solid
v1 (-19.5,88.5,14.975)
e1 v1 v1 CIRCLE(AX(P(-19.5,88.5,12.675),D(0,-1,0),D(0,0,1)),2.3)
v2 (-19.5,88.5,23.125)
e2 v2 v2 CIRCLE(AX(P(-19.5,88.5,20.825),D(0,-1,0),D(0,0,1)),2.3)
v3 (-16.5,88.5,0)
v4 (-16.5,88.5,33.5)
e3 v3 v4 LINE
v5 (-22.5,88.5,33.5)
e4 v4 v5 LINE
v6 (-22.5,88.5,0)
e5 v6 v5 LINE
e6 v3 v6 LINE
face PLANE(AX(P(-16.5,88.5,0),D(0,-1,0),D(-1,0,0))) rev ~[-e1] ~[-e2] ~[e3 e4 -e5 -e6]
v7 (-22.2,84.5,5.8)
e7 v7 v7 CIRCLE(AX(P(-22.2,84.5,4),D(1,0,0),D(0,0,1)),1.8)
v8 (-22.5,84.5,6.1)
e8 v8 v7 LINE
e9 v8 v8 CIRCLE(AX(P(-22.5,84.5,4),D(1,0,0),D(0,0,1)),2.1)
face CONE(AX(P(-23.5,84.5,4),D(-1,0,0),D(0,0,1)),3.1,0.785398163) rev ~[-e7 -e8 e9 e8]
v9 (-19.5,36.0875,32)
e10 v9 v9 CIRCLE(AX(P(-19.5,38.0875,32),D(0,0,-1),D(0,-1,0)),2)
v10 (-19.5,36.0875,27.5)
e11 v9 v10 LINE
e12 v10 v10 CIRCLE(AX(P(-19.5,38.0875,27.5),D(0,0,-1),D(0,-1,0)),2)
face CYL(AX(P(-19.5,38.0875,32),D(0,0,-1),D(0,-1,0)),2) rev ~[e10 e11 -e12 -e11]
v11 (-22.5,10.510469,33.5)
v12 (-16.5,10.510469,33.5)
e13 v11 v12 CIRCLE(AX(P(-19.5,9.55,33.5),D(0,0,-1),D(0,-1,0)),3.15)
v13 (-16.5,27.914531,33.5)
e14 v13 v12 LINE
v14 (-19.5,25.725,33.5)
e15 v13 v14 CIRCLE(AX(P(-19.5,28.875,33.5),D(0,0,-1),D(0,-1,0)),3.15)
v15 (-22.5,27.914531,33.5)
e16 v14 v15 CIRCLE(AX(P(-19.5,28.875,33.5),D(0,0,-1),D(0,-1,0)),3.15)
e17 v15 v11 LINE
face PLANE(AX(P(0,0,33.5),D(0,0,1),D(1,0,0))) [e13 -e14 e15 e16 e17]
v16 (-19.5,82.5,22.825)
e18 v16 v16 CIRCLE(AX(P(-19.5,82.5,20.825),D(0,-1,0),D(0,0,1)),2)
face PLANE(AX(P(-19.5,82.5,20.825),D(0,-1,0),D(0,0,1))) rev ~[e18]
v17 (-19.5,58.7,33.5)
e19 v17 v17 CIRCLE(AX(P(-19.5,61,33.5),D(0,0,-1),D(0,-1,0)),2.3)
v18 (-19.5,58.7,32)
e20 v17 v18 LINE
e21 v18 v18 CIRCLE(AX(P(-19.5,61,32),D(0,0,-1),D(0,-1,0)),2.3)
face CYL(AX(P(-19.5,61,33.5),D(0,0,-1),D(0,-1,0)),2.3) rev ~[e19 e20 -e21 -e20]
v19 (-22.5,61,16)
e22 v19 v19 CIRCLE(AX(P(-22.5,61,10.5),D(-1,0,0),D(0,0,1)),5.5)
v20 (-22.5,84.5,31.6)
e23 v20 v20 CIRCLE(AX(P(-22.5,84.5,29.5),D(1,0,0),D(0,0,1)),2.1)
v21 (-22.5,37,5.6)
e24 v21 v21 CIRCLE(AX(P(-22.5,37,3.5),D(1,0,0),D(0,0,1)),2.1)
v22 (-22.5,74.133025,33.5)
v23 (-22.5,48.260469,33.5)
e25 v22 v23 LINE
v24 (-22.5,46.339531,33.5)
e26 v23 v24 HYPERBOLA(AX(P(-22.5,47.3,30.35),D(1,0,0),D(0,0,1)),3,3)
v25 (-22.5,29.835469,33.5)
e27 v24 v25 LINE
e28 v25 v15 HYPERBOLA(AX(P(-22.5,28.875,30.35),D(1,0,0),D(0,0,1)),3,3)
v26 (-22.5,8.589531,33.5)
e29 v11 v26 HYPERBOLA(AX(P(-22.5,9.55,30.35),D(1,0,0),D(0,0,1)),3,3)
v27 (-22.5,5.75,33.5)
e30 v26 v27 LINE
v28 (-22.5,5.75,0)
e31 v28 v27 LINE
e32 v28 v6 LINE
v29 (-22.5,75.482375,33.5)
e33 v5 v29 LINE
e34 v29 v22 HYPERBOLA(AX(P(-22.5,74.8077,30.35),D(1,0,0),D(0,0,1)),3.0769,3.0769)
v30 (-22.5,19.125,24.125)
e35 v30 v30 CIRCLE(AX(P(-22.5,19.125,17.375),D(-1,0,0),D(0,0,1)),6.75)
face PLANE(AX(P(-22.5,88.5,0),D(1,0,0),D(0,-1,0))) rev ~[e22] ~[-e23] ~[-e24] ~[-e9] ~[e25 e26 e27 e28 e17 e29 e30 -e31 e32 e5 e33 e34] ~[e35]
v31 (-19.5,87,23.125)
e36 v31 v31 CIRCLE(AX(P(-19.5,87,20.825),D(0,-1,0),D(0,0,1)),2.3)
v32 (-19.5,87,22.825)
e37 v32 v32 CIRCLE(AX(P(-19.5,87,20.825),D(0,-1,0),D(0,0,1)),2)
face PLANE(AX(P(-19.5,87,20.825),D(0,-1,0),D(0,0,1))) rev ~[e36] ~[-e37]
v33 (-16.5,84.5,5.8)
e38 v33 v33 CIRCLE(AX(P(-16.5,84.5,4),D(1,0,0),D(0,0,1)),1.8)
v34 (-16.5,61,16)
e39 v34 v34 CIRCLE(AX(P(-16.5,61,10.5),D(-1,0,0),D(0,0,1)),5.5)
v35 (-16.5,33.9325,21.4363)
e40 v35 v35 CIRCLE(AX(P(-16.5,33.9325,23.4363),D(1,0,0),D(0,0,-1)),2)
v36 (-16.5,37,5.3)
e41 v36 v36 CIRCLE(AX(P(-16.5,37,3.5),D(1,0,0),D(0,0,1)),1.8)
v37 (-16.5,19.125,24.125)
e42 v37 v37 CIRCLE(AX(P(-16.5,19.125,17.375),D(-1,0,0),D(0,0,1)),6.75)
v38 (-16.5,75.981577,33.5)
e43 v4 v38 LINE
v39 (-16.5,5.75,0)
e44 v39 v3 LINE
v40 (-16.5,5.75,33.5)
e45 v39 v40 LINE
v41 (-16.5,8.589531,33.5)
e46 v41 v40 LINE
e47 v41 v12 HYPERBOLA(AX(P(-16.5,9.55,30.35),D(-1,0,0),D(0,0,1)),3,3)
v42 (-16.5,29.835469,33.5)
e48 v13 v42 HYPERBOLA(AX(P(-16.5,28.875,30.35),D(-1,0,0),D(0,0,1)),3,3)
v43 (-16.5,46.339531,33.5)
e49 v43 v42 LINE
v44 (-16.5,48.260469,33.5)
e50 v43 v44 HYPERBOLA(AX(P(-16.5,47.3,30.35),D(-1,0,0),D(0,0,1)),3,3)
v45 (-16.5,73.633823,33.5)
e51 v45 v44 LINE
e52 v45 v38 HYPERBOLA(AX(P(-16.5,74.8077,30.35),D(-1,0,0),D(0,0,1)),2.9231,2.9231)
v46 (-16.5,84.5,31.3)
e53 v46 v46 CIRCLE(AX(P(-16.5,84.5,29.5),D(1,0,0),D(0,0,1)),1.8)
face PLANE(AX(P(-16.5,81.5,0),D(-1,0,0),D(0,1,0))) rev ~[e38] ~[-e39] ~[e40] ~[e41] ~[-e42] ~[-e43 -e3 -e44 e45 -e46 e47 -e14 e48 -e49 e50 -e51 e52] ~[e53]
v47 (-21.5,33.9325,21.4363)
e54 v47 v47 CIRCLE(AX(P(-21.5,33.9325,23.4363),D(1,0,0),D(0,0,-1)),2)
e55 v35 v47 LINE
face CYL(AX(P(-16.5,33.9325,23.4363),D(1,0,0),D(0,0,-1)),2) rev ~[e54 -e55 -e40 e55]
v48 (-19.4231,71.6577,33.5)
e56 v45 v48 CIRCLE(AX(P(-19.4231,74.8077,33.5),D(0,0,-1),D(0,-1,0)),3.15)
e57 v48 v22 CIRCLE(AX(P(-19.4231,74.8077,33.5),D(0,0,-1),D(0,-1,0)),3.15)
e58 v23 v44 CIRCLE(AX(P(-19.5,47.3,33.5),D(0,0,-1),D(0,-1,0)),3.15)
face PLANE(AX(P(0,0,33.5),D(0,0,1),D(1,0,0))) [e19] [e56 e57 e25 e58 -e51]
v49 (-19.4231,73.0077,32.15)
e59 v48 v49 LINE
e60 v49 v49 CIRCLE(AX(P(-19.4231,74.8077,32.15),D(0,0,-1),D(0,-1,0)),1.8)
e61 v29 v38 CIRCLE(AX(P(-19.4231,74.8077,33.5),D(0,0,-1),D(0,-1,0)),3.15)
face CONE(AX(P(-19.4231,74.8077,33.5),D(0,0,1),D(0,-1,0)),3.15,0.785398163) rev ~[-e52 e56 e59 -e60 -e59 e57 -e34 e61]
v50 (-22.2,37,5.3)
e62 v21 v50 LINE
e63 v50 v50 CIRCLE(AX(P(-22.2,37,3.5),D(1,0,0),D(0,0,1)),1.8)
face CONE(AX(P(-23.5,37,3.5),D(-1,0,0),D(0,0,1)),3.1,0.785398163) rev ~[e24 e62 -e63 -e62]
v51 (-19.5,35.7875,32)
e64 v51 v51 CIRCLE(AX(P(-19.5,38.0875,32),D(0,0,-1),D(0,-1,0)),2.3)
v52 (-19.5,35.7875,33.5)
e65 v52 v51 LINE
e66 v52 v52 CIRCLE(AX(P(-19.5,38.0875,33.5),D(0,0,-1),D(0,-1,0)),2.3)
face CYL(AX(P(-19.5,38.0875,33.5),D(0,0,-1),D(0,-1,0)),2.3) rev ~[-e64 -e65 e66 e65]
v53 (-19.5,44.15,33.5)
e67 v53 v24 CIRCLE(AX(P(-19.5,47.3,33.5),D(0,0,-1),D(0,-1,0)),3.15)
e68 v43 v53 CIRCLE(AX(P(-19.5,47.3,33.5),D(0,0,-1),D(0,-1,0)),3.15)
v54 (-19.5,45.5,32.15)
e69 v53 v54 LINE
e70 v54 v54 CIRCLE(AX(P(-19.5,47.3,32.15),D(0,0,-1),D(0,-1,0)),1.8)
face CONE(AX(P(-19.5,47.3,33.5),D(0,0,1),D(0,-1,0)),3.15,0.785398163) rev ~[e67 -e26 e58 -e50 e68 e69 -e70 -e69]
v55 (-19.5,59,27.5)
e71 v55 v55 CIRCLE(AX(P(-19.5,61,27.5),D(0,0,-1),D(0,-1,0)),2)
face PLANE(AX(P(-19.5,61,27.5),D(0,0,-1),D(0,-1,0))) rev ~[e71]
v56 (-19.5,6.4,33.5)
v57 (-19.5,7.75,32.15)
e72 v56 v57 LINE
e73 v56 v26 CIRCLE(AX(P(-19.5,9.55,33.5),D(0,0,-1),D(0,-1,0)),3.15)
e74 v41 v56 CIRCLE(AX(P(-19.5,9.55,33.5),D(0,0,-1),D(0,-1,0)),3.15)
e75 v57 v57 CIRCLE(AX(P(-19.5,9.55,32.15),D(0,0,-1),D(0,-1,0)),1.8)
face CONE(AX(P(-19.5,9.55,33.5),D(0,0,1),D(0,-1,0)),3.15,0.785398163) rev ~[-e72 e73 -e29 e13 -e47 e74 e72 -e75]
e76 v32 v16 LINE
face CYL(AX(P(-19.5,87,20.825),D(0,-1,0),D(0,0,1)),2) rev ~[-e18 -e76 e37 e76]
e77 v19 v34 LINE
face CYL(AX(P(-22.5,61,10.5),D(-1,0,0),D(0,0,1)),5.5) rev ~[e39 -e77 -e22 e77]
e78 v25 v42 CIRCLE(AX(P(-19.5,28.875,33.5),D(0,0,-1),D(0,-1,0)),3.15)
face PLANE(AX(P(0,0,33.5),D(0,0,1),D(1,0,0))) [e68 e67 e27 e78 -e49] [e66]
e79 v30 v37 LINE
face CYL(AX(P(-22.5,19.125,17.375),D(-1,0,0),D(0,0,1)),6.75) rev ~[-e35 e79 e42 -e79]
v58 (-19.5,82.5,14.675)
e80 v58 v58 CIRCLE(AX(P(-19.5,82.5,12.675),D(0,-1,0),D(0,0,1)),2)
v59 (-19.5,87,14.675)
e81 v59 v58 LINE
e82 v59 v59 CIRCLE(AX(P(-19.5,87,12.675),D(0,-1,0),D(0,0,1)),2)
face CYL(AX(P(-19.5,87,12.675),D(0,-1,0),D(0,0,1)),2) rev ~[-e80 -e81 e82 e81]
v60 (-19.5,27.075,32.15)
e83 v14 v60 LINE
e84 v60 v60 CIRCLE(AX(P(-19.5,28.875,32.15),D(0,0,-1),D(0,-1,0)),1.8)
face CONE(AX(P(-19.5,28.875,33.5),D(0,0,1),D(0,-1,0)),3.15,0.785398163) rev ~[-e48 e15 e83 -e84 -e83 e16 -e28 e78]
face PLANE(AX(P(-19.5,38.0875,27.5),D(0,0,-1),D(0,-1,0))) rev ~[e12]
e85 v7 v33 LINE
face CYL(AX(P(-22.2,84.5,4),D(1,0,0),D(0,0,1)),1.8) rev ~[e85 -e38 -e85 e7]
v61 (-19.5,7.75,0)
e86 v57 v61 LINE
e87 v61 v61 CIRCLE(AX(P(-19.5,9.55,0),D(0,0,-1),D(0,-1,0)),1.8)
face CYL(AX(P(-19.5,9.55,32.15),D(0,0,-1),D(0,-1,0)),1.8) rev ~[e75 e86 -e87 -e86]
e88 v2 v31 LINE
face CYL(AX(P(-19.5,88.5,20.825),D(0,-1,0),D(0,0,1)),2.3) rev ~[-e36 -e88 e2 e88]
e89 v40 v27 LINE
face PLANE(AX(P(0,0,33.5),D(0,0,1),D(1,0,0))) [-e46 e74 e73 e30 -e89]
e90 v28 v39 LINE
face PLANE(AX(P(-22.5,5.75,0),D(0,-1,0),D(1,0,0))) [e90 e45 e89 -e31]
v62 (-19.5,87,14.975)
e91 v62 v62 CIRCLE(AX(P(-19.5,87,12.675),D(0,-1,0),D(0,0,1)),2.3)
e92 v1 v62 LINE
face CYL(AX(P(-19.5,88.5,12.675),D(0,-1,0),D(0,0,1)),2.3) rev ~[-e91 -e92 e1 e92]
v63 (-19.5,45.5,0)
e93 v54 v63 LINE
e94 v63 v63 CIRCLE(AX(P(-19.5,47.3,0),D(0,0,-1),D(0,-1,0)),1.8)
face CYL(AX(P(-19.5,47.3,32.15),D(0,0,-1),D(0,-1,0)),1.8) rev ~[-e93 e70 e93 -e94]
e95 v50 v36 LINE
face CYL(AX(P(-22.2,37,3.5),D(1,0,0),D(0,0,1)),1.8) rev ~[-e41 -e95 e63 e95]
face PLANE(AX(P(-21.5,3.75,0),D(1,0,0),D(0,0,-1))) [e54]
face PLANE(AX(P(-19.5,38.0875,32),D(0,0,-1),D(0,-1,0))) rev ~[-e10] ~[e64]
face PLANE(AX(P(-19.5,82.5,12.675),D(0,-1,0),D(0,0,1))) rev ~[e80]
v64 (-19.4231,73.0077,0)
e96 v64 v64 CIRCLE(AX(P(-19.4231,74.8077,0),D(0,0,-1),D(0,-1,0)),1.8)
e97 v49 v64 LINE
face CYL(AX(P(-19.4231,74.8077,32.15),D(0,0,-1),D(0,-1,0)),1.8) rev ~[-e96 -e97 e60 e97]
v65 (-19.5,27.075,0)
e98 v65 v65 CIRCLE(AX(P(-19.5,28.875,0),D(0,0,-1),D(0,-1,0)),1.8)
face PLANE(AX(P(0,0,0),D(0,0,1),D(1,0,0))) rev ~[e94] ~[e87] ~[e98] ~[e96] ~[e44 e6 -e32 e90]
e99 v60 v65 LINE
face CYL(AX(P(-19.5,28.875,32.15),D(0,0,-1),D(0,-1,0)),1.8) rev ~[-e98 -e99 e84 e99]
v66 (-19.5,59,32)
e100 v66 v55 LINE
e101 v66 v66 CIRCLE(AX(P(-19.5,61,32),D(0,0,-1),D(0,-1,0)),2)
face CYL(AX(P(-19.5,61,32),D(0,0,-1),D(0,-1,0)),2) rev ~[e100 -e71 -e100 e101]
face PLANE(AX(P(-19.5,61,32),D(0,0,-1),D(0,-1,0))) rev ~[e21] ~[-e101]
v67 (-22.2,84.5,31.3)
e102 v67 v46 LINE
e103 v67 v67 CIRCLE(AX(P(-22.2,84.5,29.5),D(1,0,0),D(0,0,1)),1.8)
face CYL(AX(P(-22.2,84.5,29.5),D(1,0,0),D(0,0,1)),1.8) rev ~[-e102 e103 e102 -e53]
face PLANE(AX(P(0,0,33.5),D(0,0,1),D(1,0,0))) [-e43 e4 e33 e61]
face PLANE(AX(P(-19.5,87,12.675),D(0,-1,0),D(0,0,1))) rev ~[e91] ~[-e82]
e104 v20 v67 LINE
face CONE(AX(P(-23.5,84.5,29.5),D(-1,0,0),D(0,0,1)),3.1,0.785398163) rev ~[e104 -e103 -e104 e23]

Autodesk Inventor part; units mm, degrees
ref_plane "YZ Plane" through (0, 0, 0) normal (1, 0, 0) x (0, 1, 0)
ref_plane "XZ Plane" through (0, 0, 0) normal (0, 1, 0) x (-1, 0, 0)
ref_plane "Work Plane1" through (0, 0, 0) normal (0, 0, 1) x (1, 0, 0)
sketch "Sketch1" plane through (0, 0, 0) normal (0, 0, 1) x (1, 0, 0)
  line L0 (23.5, 88.5) -> (-23.5, 88.5) projected
  line L1 (-23.5, 88.5) -> (-23.5, 36.5) projected
  line L2 (-26.5, 33.5) -> (-89, 33.5) projected
  line L3 (-89, 33.5) -> (-89, -72.5) projected
  line L4 (-89, -72.5) -> (-77, -72.5) projected
  line L5 (-74, -75.5) -> (-74, -93.5) projected
  line L6 (-74, -93.5) -> (74, -93.5) projected
  line L7 (74, -93.5) -> (74, -75.5) projected
  line L8 (77, -72.5) -> (89, -72.5) projected
  line L9 (89, -72.5) -> (89, 33.5) projected
  line L10 (89, 33.5) -> (26.5, 33.5) projected
  line L11 (23.5, 36.5) -> (23.5, 88.5) projected
  line L12 (-4.5, 81.5) -> (-4.5, 36.5) projected
  line L13 (-7.5, 33.5) -> (-13.5, 33.5) projected
  line L14 (-16.5, 36.5) -> (-16.5, 81.5) projected
  line L15 (-13.5, 84.5) -> (-7.5, 84.5) projected
  line L16 (16.5, 81.5) -> (16.5, 36.5) projected
  line L17 (13.5, 33.5) -> (7.5, 33.5) projected
  line L18 (4.5, 36.5) -> (4.5, 81.5) projected
  line L19 (7.5, 84.5) -> (13.5, 84.5) projected
  line L20 (-16.5, 88.5) -> (-22.5, 88.5)
  line L21 (-22.5, 88.5) -> (-22.5, 3.75)
  line L22 (-22.5, 3.75) -> (-16.5, 3.75)
  line L23 (-16.5, 3.75) -> (-16.5, 88.5)
  line L24 (-32.2, 4.75) -> (-59.9, 4.75)
  arc A0 (13.5, 33.5) -> (16.5, 36.5) centre (13.5, 36.5) ccw projected
  arc A1 (4.5, 36.5) -> (7.5, 33.5) centre (7.5, 36.5) ccw projected
  arc A2 (7.5, 84.5) -> (4.5, 81.5) centre (7.5, 81.5) ccw projected
  arc A3 (16.5, 81.5) -> (13.5, 84.5) centre (13.5, 81.5) ccw projected
  arc A4 (-4.5, 81.5) -> (-7.5, 84.5) centre (-7.5, 81.5) ccw projected
  arc A5 (-7.5, 33.5) -> (-4.5, 36.5) centre (-7.5, 36.5) ccw projected
  arc A6 (-16.5, 36.5) -> (-13.5, 33.5) centre (-13.5, 36.5) ccw projected
  arc A7 (-13.5, 84.5) -> (-16.5, 81.5) centre (-13.5, 81.5) ccw projected
  arc A8 (-26.5, 33.5) -> (-23.5, 36.5) centre (-26.5, 36.5) ccw projected
  arc A9 (-74, -75.5) -> (-77, -72.5) centre (-77, -75.5) ccw projected
  arc A10 (77, -72.5) -> (74, -75.5) centre (77, -75.5) ccw projected
  arc A11 (23.5, 36.5) -> (26.5, 33.5) centre (26.5, 36.5) ccw projected
  circle A12 centre (39.125, 25.9125) radius 1.0065 projected
  circle A13 centre (72.95, 12.275) radius 1.0065 projected
  circle A14 centre (-39.125, 12.3375) radius 1.0065 projected
  circle A15 centre (-72.95, 25.975) radius 1.0065 projected
  circle A16 centre (-72.95, 12.275) radius 1.0065 projected
  circle A17 centre (-39.125, 25.9125) radius 1.0065 projected
  circle A18 centre (72.95, 25.975) radius 1.0065 projected
  circle A19 centre (39.125, 12.3375) radius 1.0065 projected
  circle A20 centre (-24.1, -73.1) radius 1.2295 projected
  circle A21 centre (-42.4984, -44.6666) radius 1.2295 projected
  circle A22 centre (-79, -42.3889) radius 1.2295 projected
  circle A23 centre (-19.5, 28.875) radius 1.2295 projected
  circle A24 centre (19.5, 9.55) radius 1.2295 projected
  circle A25 centre (19.5, 47.3) radius 1.2295 projected
  circle A26 centre (-19.5, 47.3) radius 1.2295 projected
  circle A27 centre (0, 74.7) radius 1.2295 projected
  circle A28 centre (-19.4231, 74.8077) radius 1.2295 projected
  circle A29 centre (19.5, 74.7) radius 1.2295 projected
  circle A30 centre (0, 49.05) radius 1.2295 projected
  circle A31 centre (19.5, 28.875) radius 1.2295 projected
  circle A32 centre (0, 19.125) radius 1.2295 projected
  circle A33 centre (-19.5, 9.55) radius 1.2295 projected
  circle A34 centre (24.1, -73.1) radius 1.2295 projected
  circle A35 centre (42.5, -44.6649) radius 1.2295 projected
  circle A36 centre (79, -42.3889) radius 1.2295 projected
  circle A37 centre (21.5, -85.5) radius 1.8 projected
  circle A38 centre (-64.5, -85.5) radius 1.8 projected
  circle A39 centre (-21.5, -85.5) radius 1.8 projected
  circle A40 centre (64.5, -85.5) radius 1.8 projected
  line L25 (-58.2315, -77.6013) -> (-80.7685, -61.1541) projected
  line L26 (-82, -58.7308) -> (-82, -48.3889) projected
  line L27 (-75.8885, -45.3972) -> (-47.1423, -47.5438) projected
  line L28 (-21.1, -26.5751) -> (-21.1, -22.0813) projected
  line L29 (-46.9357, -41.5592) -> (-76, -39.3889) projected
  line L30 (-82, -36.3889) -> (-82, 1.75) projected
  line L31 (32.9914, 4.75) -> (79, 4.75) projected
  line L32 (82, -48.3889) -> (82, -58.7308) projected
  line L33 (76, -39.3889) -> (46.9371, -41.5577) projected
  line L34 (21.1, -22.0813) -> (21.1, -26.5749) projected
  line L35 (47.144, -47.5423) -> (76, -45.3889) projected
  line L36 (82, 1.75) -> (82, -36.3889) projected
  line L37 (80.7685, -61.1541) -> (58.2315, -77.6013) projected
  line L38 (57, -80.0246) -> (57, -87.5) projected
  arc A41 (55, -89.5) -> (57, -87.5) centre (55, -87.5) ccw projected
  line L39 (55, -89.5) -> (31, -89.5) projected
  arc A42 (29, -87.5) -> (31, -89.5) centre (31, -87.5) ccw projected
  line L40 (29, -87.5) -> (29, -79.2522) projected
  line L41 (14, -79.5039) -> (14, -87.5) projected
  arc A43 (12, -89.5) -> (14, -87.5) centre (12, -87.5) ccw projected
  line L42 (12, -89.5) -> (-12, -89.5) projected
  arc A44 (-14, -87.5) -> (-12, -89.5) centre (-12, -87.5) ccw projected
  line L43 (-14, -87.5) -> (-14, -79.5039) projected
  line L44 (-29, -79.2522) -> (-29, -87.5) projected
  arc A45 (-31, -89.5) -> (-29, -87.5) centre (-31, -87.5) ccw projected
  line L45 (-31, -89.5) -> (-55, -89.5) projected
  arc A46 (-57, -87.5) -> (-55, -89.5) centre (-55, -87.5) ccw projected
  line L46 (-57, -87.5) -> (-57, -80.0246) projected
  line L47 (-66.95, 28.9125) -> (-45.125, 28.9125) projected
  line L48 (-42.125, 25.9125) -> (-42.125, 12.275) projected
  line L49 (-45.125, 9.275) -> (-66.95, 9.275) projected
  line L50 (-69.95, 12.275) -> (-69.95, 25.9125) projected
  line L51 (-16.5, 12.75) -> (-16.5, 25.5) projected
  line L52 (-13.5, 28.5) -> (-7.5, 28.5) projected
  line L53 (-4.5, 25.5) -> (-4.5, 12.75) projected
  line L54 (-7.5, 9.75) -> (-13.5, 9.75) projected
  line L55 (66.95, 9.3375) -> (45.125, 9.3375) projected
  line L56 (42.125, 12.3375) -> (42.125, 25.975) projected
  line L57 (45.125, 28.975) -> (66.95, 28.975) projected
  line L58 (69.95, 25.975) -> (69.95, 12.3375) projected
  line L59 (4.5, 12.75) -> (4.5, 25.5) projected
  line L60 (7.5, 28.5) -> (13.5, 28.5) projected
  line L61 (16.5, 25.5) -> (16.5, 12.75) projected
  line L62 (13.5, 9.75) -> (7.5, 9.75) projected
  line L63 (44.5181, -40.6102) -> (28.0504, -22.9209) projected
  line L64 (27.268, -20.5154) -> (30.0132, 2.1113) projected
  line L65 (-44.7206, -49.1201) -> (-29.3549, -77.8368) projected
  line L66 (-79, 4.75) -> (-32.9914, 4.75) projected
  line L67 (-30.0132, 2.1113) -> (-27.268, -20.5155) projected
  line L68 (-28.0502, -22.9208) -> (-44.5164, -40.6115) projected
  line L69 (29.3549, -77.8368) -> (44.7222, -49.1185) projected
  line L70 (-14.6042, -77.6983) -> (-37.8537, -46.8489) projected
  line L71 (-37.4786, -42.8259) -> (-22.0793, -28.7924) projected
  line L72 (-21.1218, -21.72) -> (-23.9255, 1.3887) projected
  line L73 (-20.9474, 4.75) -> (20.9474, 4.75) projected
  line L74 (23.9255, 1.3887) -> (21.1218, -21.72) projected
  line L75 (22.0795, -28.7925) -> (37.4798, -42.8243) projected
  line L76 (37.8551, -46.8475) -> (14.6042, -77.6983) projected
  circle A47 centre (-78, -67.1725) radius 1.2295 projected
  arc A48 (79, -39.3889) -> (82, -36.3889) centre (79, -36.3889) ccw projected
  arc A49 (44.5181, -40.6102) -> (46.9371, -41.5577) centre (46.7138, -38.566) ccw projected
  arc A50 (27.268, -20.5154) -> (28.0504, -22.9209) centre (30.2461, -20.8767) ccw projected
  arc A51 (32.9914, 4.75) -> (30.0132, 2.1113) centre (32.9914, 1.75) ccw projected
  arc A52 (82, 1.75) -> (79, 4.75) centre (79, 1.75) ccw projected
  arc A53 (-42.125, 25.9125) -> (-45.125, 28.9125) centre (-45.125, 25.9125) ccw projected
  arc A54 (-45.125, 9.275) -> (-42.125, 12.275) centre (-45.125, 12.275) ccw projected
  arc A55 (-69.95, 12.275) -> (-66.95, 9.275) centre (-66.95, 12.275) ccw projected
  arc A56 (-66.95, 28.9125) -> (-69.95, 25.9125) centre (-66.95, 25.9125) ccw projected
  arc A57 (-13.5, 28.5) -> (-16.5, 25.5) centre (-13.5, 25.5) ccw projected
  arc A58 (-4.5, 25.5) -> (-7.5, 28.5) centre (-7.5, 25.5) ccw projected
  arc A59 (-7.5, 9.75) -> (-4.5, 12.75) centre (-7.5, 12.75) ccw projected
  arc A60 (-16.5, 12.75) -> (-13.5, 9.75) centre (-13.5, 12.75) ccw projected
  arc A61 (58.2315, -77.6013) -> (57, -80.0246) centre (60, -80.0246) ccw projected
  arc A62 (29.3549, -77.8368) -> (29, -79.2522) centre (32, -79.2522) ccw projected
  arc A63 (47.144, -47.5423) -> (44.7222, -49.1185) centre (47.3673, -50.5339) ccw projected
  arc A64 (82, -48.3889) -> (79, -45.3889) centre (79, -48.3889) ccw projected
  arc A65 (80.7685, -61.1541) -> (82, -58.7308) centre (79, -58.7308) ccw projected
  arc A66 (-21.1, -22.0813) -> (-21.1218, -21.72) centre (-24.1, -22.0813) ccw projected
  arc A67 (-20.9474, 4.75) -> (-23.9255, 1.3887) centre (-20.9474, 1.75) ccw projected
  arc A68 (23.9255, 1.3887) -> (20.9474, 4.75) centre (20.9474, 1.75) ccw projected
  arc A69 (21.1218, -21.72) -> (21.1, -22.0813) centre (24.1, -22.0813) ccw projected
  arc A70 (21.1, -26.5749) -> (22.0795, -28.7925) centre (24.1, -26.5749) ccw projected
  arc A71 (37.8551, -46.8475) -> (37.4798, -42.8243) centre (35.4593, -45.0419) ccw projected
  arc A72 (14.6042, -77.6983) -> (14, -79.5039) centre (17, -79.5039) ccw projected
  arc A73 (-14, -79.5039) -> (-14.6042, -77.6983) centre (-17, -79.5039) ccw projected
  arc A74 (-37.4786, -42.8259) -> (-37.8537, -46.8489) centre (-35.4579, -45.0433) ccw projected
  arc A75 (-22.0793, -28.7924) -> (-21.1, -26.5751) centre (-24.1, -26.5751) ccw projected
  arc A76 (-82, -36.3889) -> (-79, -39.3889) centre (-79, -36.3889) ccw projected
  arc A77 (-79, 4.75) -> (-82, 1.75) centre (-79, 1.75) ccw projected
  arc A78 (-30.0132, 2.1113) -> (-32.9914, 4.75) centre (-32.9914, 1.75) ccw projected
  arc A79 (-28.0502, -22.9208) -> (-27.268, -20.5155) centre (-30.2461, -20.8769) ccw projected
  arc A80 (-46.9357, -41.5592) -> (-44.5164, -40.6115) centre (-46.7123, -38.5676) ccw projected
  arc A81 (7.5, 28.5) -> (4.5, 25.5) centre (7.5, 25.5) ccw projected
  arc A82 (16.5, 25.5) -> (13.5, 28.5) centre (13.5, 25.5) ccw projected
  arc A83 (13.5, 9.75) -> (16.5, 12.75) centre (13.5, 12.75) ccw projected
  arc A84 (4.5, 12.75) -> (7.5, 9.75) centre (7.5, 12.75) ccw projected
  arc A85 (-57, -80.0246) -> (-58.2315, -77.6013) centre (-60, -80.0246) ccw projected
  arc A86 (-82, -58.7308) -> (-80.7685, -61.1541) centre (-79, -58.7308) ccw projected
  arc A87 (-75.8885, -45.3972) -> (-76.1119, -45.3889) centre (-76.1119, -48.3889) ccw projected
  arc A88 (-44.7206, -49.1201) -> (-47.1423, -47.5438) centre (-47.3657, -50.5355) ccw projected
  arc A89 (-29, -79.2522) -> (-29.3549, -77.8368) centre (-32, -79.2522) ccw projected
  arc A90 (42.125, 12.3375) -> (45.125, 9.3375) centre (45.125, 12.3375) ccw projected
  arc A91 (45.125, 28.975) -> (42.125, 25.975) centre (45.125, 25.975) ccw projected
  arc A92 (69.95, 25.975) -> (66.95, 28.975) centre (66.95, 25.975) ccw projected
  arc A93 (66.95, 9.3375) -> (69.95, 12.3375) centre (66.95, 12.3375) ccw projected
  circle A94 centre (78, -67.1725) radius 1.2295 projected
  line L77 (-22.5, 25.9125) -> (-22.5, 12.55) projected
  arc A95 (-25.5, 9.55) -> (-22.5, 12.55) centre (-25.5, 12.55) ccw projected
  line L78 (-25.5, 9.55) -> (-33.125, 9.55) projected
  arc A96 (-36.125, 12.55) -> (-33.125, 9.55) centre (-33.125, 12.55) ccw projected
  line L79 (-36.125, 12.55) -> (-36.125, 25.9125) projected
  arc A97 (-33.125, 28.9125) -> (-36.125, 25.9125) centre (-33.125, 25.9125) ccw projected
  line L80 (-33.125, 28.9125) -> (-25.5, 28.9125) projected
  arc A98 (-22.5, 25.9125) -> (-25.5, 28.9125) centre (-25.5, 25.9125) ccw projected
  line L81 (76, -45.3889) -> (79, -45.3889) projected
  line L82 (79, -39.3889) -> (76, -39.3889) projected
  line L83 (33.125, 9.275) -> (25.5, 9.275) projected
  arc A99 (22.5, 12.275) -> (25.5, 9.275) centre (25.5, 12.275) ccw projected
  line L84 (22.5, 12.275) -> (22.5, 25.9125) projected
  arc A100 (25.5, 28.9125) -> (22.5, 25.9125) centre (25.5, 25.9125) ccw projected
  line L85 (25.5, 28.9125) -> (33.125, 28.9125) projected
  arc A101 (36.125, 25.9125) -> (33.125, 28.9125) centre (33.125, 25.9125) ccw projected
  line L86 (36.125, 25.9125) -> (36.125, 12.275) projected
  arc A102 (33.125, 9.275) -> (36.125, 12.275) centre (33.125, 12.275) ccw projected
  line L87 (-83, 28.975) -> (-78.95, 28.975) projected
  arc A103 (-75.95, 25.975) -> (-78.95, 28.975) centre (-78.95, 25.975) ccw projected
  line L88 (-75.95, 25.975) -> (-75.95, 12.275) projected
  arc A104 (-78.95, 9.275) -> (-75.95, 12.275) centre (-78.95, 12.275) ccw projected
  line L89 (-78.95, 9.275) -> (-83, 9.275) projected
  arc A105 (-86, 12.275) -> (-83, 9.275) centre (-83, 12.275) ccw projected
  line L90 (-86, 12.275) -> (-86, 25.975) projected
  arc A106 (-83, 28.975) -> (-86, 25.975) centre (-83, 25.975) ccw projected
  arc A107 (-79, -45.3889) -> (-82, -48.3889) centre (-79, -48.3889) ccw projected
  line L91 (-79, -45.3889) -> (-76.1119, -45.3889) projected
  line L92 (-76, -39.3889) -> (-79, -39.3889) projected
  line L93 (78.95, 28.975) -> (83, 28.975) projected
  arc A108 (86, 25.975) -> (83, 28.975) centre (83, 25.975) ccw projected
  line L94 (86, 25.975) -> (86, 12.275) projected
  arc A109 (83, 9.275) -> (86, 12.275) centre (83, 12.275) ccw projected
  line L95 (83, 9.275) -> (78.95, 9.275) projected
  arc A110 (75.95, 12.275) -> (78.95, 9.275) centre (78.95, 12.275) ccw projected
  line L96 (75.95, 12.275) -> (75.95, 25.975) projected
  arc A111 (78.95, 28.975) -> (75.95, 25.975) centre (78.95, 25.975) ccw projected
  circle A112 centre (24.1, -24.9) radius 1.2295 projected
  circle A113 centre (-24.1, -24.9) radius 1.2295 projected
  point P0 (0, 0)
  point P1 (-16.5, 36.5)
  point P2 (-16.5, 81.5)
  point P3 (7.5, 81.5)
  point P4 (13.5, 81.5)
  point P5 (-7.5, 81.5)
  point P6 (-13.5, 81.5)
  point P7 (-77, -75.5)
  point P8 (39, -44.2094)
  point P9 (-16.5, 9.75)
  point P10 (-16.5, 28.5)
  point P11 (-79, -67.8878)
  point P12 (-79, -66.4572)
  dimension "d0" = 1
  dimension "d2" = 1
ref_plane "Work Plane2" through (-89, -40.3889, 33.5) normal (0, 0, 1) x (1, 0, 0)
extrude "Extrusion1" add sketch "Sketch1" along normal up to surface (33.5 mm away) contours L23 L14 L73 A67 L21 L0 | A67 L73 L23 L22 L21 | A23 | A26 | A28 | A33
sketch "Sketch2" plane through (-22.5, 3.75, 0) normal (-1, 0, 0) x (0, 0, 1)
  arc A0 (15.7043, 9.7757) -> (16.863, 11.545) centre (12.3771, 13.2188) ccw projected
  arc A1 (16.863, 11.545) -> (17.4685, 11.512) centre (17.375, 15.375) ccw projected
  arc A2 (17.4685, 11.512) -> (18.4285, 9.6275) centre (22.1095, 12.6893) ccw projected
  arc A3 (18.4285, 9.6275) -> (19.3146, 9.863) centre (17.375, 15.375) ccw projected
  arc A4 (19.3146, 9.863) -> (19.2121, 11.9755) centre (14.599, 10.6929) ccw projected
  arc A5 (19.2121, 11.9755) -> (19.7212, 12.3047) centre (17.375, 15.375) ccw projected
  arc A6 (19.7212, 12.3047) -> (21.6056, 11.3444) centre (22.7839, 15.9851) ccw projected
  arc A7 (21.6056, 11.3444) -> (22.184, 12.0558) centre (17.375, 15.375) ccw projected
  arc A8 (22.184, 12.0558) -> (20.8594, 13.7045) centre (17.8813, 9.9554) ccw projected
  arc A9 (20.8594, 13.7045) -> (21.0778, 14.2702) centre (17.375, 15.375) ccw projected
  arc A10 (21.0778, 14.2702) -> (23.1668, 14.6008) centre (21.3923, 19.0479) ccw projected
  arc A11 (23.1668, 14.6008) -> (23.2166, 15.5164) centre (17.375, 15.375) ccw projected
  arc A12 (23.2166, 15.5164) -> (21.1758, 16.0716) centre (20.9701, 11.288) ccw projected
  arc A13 (21.1758, 16.0716) -> (21.02, 16.6576) centre (17.375, 15.375) ccw projected
  arc A14 (21.02, 16.6576) -> (22.5157, 18.153) centre (18.4662, 20.7077) ccw projected
  arc A15 (22.5157, 18.153) -> (22.0178, 18.923) centre (17.375, 15.375) ccw projected
  arc A16 (22.0178, 18.923) -> (20.0404, 18.1726) centre (22.6858, 14.1817) ccw projected
  arc A17 (20.0404, 18.1726) -> (19.57, 18.5552) centre (17.375, 15.375) ccw projected
  arc A18 (19.57, 18.5552) -> (19.9011, 20.644) centre (15.1233, 20.3306) ccw projected
  arc A19 (19.9011, 20.644) -> (19.0457, 20.9743) centre (17.375, 15.375) ccw projected
  arc A20 (19.0457, 20.9743) -> (17.887, 19.205) centre (22.3729, 17.5312) ccw projected
  arc A21 (17.887, 19.205) -> (17.2815, 19.238) centre (17.375, 15.375) ccw projected
  arc A22 (17.2815, 19.238) -> (16.3215, 21.1225) centre (12.6405, 18.0607) ccw projected
  arc A23 (16.3215, 21.1225) -> (15.4354, 20.887) centre (17.375, 15.375) ccw projected
  arc A24 (15.4354, 20.887) -> (15.5379, 18.7745) centre (20.151, 20.0571) ccw projected
  arc A25 (15.5379, 18.7745) -> (15.0288, 18.4453) centre (17.375, 15.375) ccw projected
  arc A26 (15.0288, 18.4453) -> (13.1444, 19.4056) centre (11.9661, 14.7649) ccw projected
  arc A27 (13.1444, 19.4056) -> (12.566, 18.6942) centre (17.375, 15.375) ccw projected
  arc A28 (12.566, 18.6942) -> (13.8906, 17.0455) centre (16.8687, 20.7946) ccw projected
  arc A29 (13.8906, 17.0455) -> (13.6722, 16.4798) centre (17.375, 15.375) ccw projected
  arc A30 (13.6722, 16.4798) -> (11.5832, 16.1492) centre (13.3577, 11.7021) ccw projected
  arc A31 (11.5832, 16.1492) -> (11.5334, 15.2336) centre (17.375, 15.375) ccw projected
  arc A32 (11.5334, 15.2336) -> (13.5742, 14.6784) centre (13.7799, 19.462) ccw projected
  arc A33 (13.5742, 14.6784) -> (13.73, 14.0924) centre (17.375, 15.375) ccw projected
  arc A34 (13.73, 14.0924) -> (12.2343, 12.597) centre (16.2838, 10.0423) ccw projected
  arc A35 (12.2343, 12.597) -> (12.7322, 11.827) centre (17.375, 15.375) ccw projected
  arc A36 (12.7322, 11.827) -> (14.7096, 12.5774) centre (12.0642, 16.5683) ccw projected
  arc A37 (14.7096, 12.5774) -> (15.18, 12.1948) centre (17.375, 15.375) ccw projected
  arc A38 (15.18, 12.1948) -> (14.8489, 10.106) centre (19.6267, 10.4194) ccw projected
  arc A39 (14.8489, 10.106) -> (15.7043, 9.7757) centre (17.375, 15.375) ccw projected
  circle A40 centre (17.375, 15.375) radius 6.75
  circle A41 centre (17.375, 15.375) radius 5.8433
  line L0 (23.2183, 15.375) -> (24.125, 15.375)
  circle A42 centre (10.5, 57.25) radius 5.5 projected
  point P0 (0, -3.75)
  dimension "d6" = 13.5
  dimension "d5" = 0.9067
  dimension "d9" = 11
extrude "Extrusion2" cut sketch "Sketch2" against normal up to next contours A39 A38 A37 A36 A35 A34 A33 A32 A31 A30 A29 A28 A27 A26 A25 A24 A23 A22 A21 A20 A19 A18 A17 A16 A15 A14 A13 A12 A11 A10 A9 A8 A7 A6 A5 A4 A3 A2 A1 A0 | A0 A1 A2 A41 | A41 A36 A37 A38 | A4 A5 A6 A41 | A41 A32 A33 A34 | A8 A9 A10 A41 | A41 A28 A29 A30 | A41 A24 A25 A26 | A12 A13 A14 A41 | A41 A20 A21 A22 | A16 A17 A18 A41 | A40 | A42
sketch "Sketch3" plane through (-16.5, 3.75, 0) normal (1, 0, 0) x (0, 0, -1)
  circle A0 centre (-23.4363, 30.1825) radius 2 projected
  point P0 (0, -3.75)
extrude "Extrusion3" cut sketch "Sketch3" against normal blind 5
ref_plane "Work Plane3" through (-23.5, 3.75, 0) normal (-1, 0, 0) x (0, 0, 1)
sketch "Sketch5" plane through (-23.5, 3.75, 0) normal (-1, 0, 0) x (0, 0, 1)
  circle A0 centre (29.5, 80.75) radius 2.1 projected
  circle A1 centre (4, 80.75) radius 2.1 projected
  circle A2 centre (3.5, 33.25) radius 2.1 projected
  point P0 (0, -3.75)
hole "Hole1" at (-23.5, 84.5, 29.5) at (-23.5, 84.5, 4) at (-23.5, 37, 3.5) direction (1, 0, 0) diameter 3.6 end through all countersink diameter 6.2 countersink angle 90 clearance for "Countersunk Flat Head Screw ISO 2009/7046" size "M3" standard "ISO"
sketch "Sketch6" plane through (-22.5, 3.75, 33.5) normal (0, 0, 1) x (1, 0, 0)
  line L0 (0, 8.625) -> (0, 22.125) projected
  line L1 (1, 32.1825) -> (1, 28.1825) projected
  line L2 (0, 31.15) -> (0, 35.35) projected
  line L3 (0, 51.75) -> (0, 62.75) projected
  line L4 (0, 78.65) -> (0, 82.85) projected
  line L5 (0, 78.65) -> (0, 82.85) projected
  line L6 (6, 0) -> (0, 0) projected
  line L7 (6, 84.75) -> (6, 0) projected
  line L8 (0, 84.75) -> (6, 84.75) projected
  line L9 (0, 0) -> (0, 84.75) projected
  line L10 (6, 28.125) -> (0, 28.125)
  line L11 (0, 28.125) -> (0, 35.35)
  line L12 (0, 35.35) -> (6, 35.35)
  line L13 (6, 35.35) -> (6, 28.125)
  line L14 (0, 8.625) -> (6, 8.625) projected
  line L15 (6, 8.625) -> (0, 8.625)
  line L16 (0, 8.625) -> (0, 22.125)
  line L17 (0, 22.125) -> (6, 22.125)
  line L18 (6, 22.125) -> (6, 8.625)
  line L19 (6, 78.95) -> (0.3, 78.95) projected
  line L20 (6, 84.75) -> (0, 84.75) projected
  line L21 (6, 78.95) -> (0, 78.95)
  line L22 (0, 78.95) -> (0, 84.75)
  line L23 (0, 84.75) -> (6, 84.75)
  line L24 (6, 84.75) -> (6, 78.95)
  line L25 (0, 51.75) -> (6, 51.75) projected
  line L26 (0, 51.75) -> (0, 62.75) projected
  line L27 (6, 51.75) -> (0, 51.75)
  line L28 (0, 51.75) -> (0, 62.75)
  line L29 (0, 62.75) -> (6, 62.75)
  line L30 (6, 62.75) -> (6, 51.75)
  line L31 (6, 0) -> (0, 0)
  line L32 (0, 0) -> (0, 4)
  line L33 (0, 4) -> (6, 4)
  line L34 (6, 4) -> (6, 0)
  circle A0 centre (3, 5.8) radius 1.8
  line L35 (6, 22.125) -> (0, 28.125)
  line L36 (0, 22.125) -> (6, 28.125)
  line L37 (6, 35.35) -> (0, 51.75)
  line L38 (0, 35.35) -> (6, 51.75)
  line L39 (0.3, 82.55) -> (0.3, 78.95) projected
  line L40 (6, 62.75) -> (0.3, 78.95)
  line L41 (6, 82.55) -> (6, 78.95) projected
  line L42 (0.3, 78.95) -> (6, 78.95)
  line L43 (6, 78.95) -> (0, 62.75)
  point P0 (22.5, -3.75)
  point P1 (3, 25.125)
  point P2 (3.0769, 71.0577)
  point P3 (3, 43.55)
  dimension "d20" = 4
  dimension "d21" = 3.6
  dimension "d22" = 3
  dimension "d23" = 3
hole "Hole2" at (-19.5, 28.875, 33.5) at (-19.5, 9.55, 33.5) at (-19.4231, 74.8077, 33.5) at (-19.5, 47.3, 33.5) direction (0, 0, -1) diameter 3.6 end through all countersink diameter 6.3 countersink angle 90 clearance for "Countersunk Flat Head Screw ISO 2009/7046" size "M3" standard "ISO"
sketch "Sketch9" plane through (-22.5, 88.5, 0) normal (0, 1, 0) x (1, 0, 0)
  circle A0 centre (22.5, -20.825) radius 2.3 projected
  circle A1 centre (22.5, -12.675) radius 2.3 projected
  line L0 (18, -33.5) -> (27, -33.5) projected
  line L1 (27, 0) -> (27, -33.5) projected
  line L2 (27, 0) -> (18, 0) projected
  line L3 (18, 0) -> (18, -33.5) projected
  line L4 (22.5, -20.825) -> (0, -20.825)
  line L5 (0, -24.125) -> (0, -10.625) projected
  line L6 (22.5, -12.675) -> (0, -12.675)
  line L7 (6, 0) -> (6, -33.5) projected
  point P0 (22.5, 0)
  point P1 (3, -20.825)
  point P2 (3, -12.675)
  dimension "d45" = 3
  dimension "d46" = 3
  dimension "d47" = 3
  dimension "d48" = 3
hole "Hole5" at (-19.5, 88.5, 20.825) at (-19.5, 88.5, 12.675) direction (0, -1, 0) diameter 4 depth 6 counterbore diameter 4.6 counterbore depth 1.5
sketch "Sketch10" plane through (-19.5, 47.3, 33.5) normal (0, 0, 1) x (1, 0, 0)
  line L0 (-3, 8.2) -> (-3, 19.2) projected
  arc A0 (3, -17.4645) -> (-3, -17.4645) centre (0, -18.425) ccw projected
  arc A1 (-3, -0.9605) -> (3, -0.9605) centre (0, 0) ccw projected
  arc A2 (3, -17.4645) -> (-3, -17.4645) centre (0, -18.425) ccw projected
  line L1 (3, -0.9605) -> (3, -17.4645) projected
  arc A3 (-3, -0.9605) -> (3, -0.9605) centre (0, 0) ccw projected
  line L2 (-3, -17.4645) -> (-3, -0.9605) projected
  line L3 (3, 8.2) -> (-3, 8.2)
  line L4 (3, 19.2) -> (-3, 19.2)
  line L5 (-3, 19.2) -> (3, 8.2)
  line L6 (-3, 8.2) -> (3, 19.2)
  line L7 (3, -17.4645) -> (-3, -0.9605)
  line L8 (-3, -17.4645) -> (3, -0.9605)
  point P0 (19.5, -47.3)
  point P1 (0, -9.2125)
  point P2 (0, 13.7)
hole "Hole6" at (-19.5, 38.0875, 33.5) at (-19.5, 61, 33.5) direction (0, 0, -1) diameter 4 depth 6 counterbore diameter 4.6 counterbore depth 1.5
sketch "Sketch11" plane through (-22.5, 3.75, 0) normal (0, -1, 0) x (1, 0, 0)
  line L0 (6, 33.5) -> (0, 33.5) projected
  line L1 (0, 0) -> (0, 33.5) projected
  line L2 (0, 0) -> (6, 0) projected
  line L3 (6, 0) -> (6, 33.5) projected
  point P0 (22.5, 0)
extrude "Extrusion4" cut sketch "Sketch11" against normal blind 2
equation "\"d22\" = d23"
equation "\"d45\" = d46"
equation "\"d47\" = d48"
properties part number "right_gear_holder" material "Nylon 6/6"
